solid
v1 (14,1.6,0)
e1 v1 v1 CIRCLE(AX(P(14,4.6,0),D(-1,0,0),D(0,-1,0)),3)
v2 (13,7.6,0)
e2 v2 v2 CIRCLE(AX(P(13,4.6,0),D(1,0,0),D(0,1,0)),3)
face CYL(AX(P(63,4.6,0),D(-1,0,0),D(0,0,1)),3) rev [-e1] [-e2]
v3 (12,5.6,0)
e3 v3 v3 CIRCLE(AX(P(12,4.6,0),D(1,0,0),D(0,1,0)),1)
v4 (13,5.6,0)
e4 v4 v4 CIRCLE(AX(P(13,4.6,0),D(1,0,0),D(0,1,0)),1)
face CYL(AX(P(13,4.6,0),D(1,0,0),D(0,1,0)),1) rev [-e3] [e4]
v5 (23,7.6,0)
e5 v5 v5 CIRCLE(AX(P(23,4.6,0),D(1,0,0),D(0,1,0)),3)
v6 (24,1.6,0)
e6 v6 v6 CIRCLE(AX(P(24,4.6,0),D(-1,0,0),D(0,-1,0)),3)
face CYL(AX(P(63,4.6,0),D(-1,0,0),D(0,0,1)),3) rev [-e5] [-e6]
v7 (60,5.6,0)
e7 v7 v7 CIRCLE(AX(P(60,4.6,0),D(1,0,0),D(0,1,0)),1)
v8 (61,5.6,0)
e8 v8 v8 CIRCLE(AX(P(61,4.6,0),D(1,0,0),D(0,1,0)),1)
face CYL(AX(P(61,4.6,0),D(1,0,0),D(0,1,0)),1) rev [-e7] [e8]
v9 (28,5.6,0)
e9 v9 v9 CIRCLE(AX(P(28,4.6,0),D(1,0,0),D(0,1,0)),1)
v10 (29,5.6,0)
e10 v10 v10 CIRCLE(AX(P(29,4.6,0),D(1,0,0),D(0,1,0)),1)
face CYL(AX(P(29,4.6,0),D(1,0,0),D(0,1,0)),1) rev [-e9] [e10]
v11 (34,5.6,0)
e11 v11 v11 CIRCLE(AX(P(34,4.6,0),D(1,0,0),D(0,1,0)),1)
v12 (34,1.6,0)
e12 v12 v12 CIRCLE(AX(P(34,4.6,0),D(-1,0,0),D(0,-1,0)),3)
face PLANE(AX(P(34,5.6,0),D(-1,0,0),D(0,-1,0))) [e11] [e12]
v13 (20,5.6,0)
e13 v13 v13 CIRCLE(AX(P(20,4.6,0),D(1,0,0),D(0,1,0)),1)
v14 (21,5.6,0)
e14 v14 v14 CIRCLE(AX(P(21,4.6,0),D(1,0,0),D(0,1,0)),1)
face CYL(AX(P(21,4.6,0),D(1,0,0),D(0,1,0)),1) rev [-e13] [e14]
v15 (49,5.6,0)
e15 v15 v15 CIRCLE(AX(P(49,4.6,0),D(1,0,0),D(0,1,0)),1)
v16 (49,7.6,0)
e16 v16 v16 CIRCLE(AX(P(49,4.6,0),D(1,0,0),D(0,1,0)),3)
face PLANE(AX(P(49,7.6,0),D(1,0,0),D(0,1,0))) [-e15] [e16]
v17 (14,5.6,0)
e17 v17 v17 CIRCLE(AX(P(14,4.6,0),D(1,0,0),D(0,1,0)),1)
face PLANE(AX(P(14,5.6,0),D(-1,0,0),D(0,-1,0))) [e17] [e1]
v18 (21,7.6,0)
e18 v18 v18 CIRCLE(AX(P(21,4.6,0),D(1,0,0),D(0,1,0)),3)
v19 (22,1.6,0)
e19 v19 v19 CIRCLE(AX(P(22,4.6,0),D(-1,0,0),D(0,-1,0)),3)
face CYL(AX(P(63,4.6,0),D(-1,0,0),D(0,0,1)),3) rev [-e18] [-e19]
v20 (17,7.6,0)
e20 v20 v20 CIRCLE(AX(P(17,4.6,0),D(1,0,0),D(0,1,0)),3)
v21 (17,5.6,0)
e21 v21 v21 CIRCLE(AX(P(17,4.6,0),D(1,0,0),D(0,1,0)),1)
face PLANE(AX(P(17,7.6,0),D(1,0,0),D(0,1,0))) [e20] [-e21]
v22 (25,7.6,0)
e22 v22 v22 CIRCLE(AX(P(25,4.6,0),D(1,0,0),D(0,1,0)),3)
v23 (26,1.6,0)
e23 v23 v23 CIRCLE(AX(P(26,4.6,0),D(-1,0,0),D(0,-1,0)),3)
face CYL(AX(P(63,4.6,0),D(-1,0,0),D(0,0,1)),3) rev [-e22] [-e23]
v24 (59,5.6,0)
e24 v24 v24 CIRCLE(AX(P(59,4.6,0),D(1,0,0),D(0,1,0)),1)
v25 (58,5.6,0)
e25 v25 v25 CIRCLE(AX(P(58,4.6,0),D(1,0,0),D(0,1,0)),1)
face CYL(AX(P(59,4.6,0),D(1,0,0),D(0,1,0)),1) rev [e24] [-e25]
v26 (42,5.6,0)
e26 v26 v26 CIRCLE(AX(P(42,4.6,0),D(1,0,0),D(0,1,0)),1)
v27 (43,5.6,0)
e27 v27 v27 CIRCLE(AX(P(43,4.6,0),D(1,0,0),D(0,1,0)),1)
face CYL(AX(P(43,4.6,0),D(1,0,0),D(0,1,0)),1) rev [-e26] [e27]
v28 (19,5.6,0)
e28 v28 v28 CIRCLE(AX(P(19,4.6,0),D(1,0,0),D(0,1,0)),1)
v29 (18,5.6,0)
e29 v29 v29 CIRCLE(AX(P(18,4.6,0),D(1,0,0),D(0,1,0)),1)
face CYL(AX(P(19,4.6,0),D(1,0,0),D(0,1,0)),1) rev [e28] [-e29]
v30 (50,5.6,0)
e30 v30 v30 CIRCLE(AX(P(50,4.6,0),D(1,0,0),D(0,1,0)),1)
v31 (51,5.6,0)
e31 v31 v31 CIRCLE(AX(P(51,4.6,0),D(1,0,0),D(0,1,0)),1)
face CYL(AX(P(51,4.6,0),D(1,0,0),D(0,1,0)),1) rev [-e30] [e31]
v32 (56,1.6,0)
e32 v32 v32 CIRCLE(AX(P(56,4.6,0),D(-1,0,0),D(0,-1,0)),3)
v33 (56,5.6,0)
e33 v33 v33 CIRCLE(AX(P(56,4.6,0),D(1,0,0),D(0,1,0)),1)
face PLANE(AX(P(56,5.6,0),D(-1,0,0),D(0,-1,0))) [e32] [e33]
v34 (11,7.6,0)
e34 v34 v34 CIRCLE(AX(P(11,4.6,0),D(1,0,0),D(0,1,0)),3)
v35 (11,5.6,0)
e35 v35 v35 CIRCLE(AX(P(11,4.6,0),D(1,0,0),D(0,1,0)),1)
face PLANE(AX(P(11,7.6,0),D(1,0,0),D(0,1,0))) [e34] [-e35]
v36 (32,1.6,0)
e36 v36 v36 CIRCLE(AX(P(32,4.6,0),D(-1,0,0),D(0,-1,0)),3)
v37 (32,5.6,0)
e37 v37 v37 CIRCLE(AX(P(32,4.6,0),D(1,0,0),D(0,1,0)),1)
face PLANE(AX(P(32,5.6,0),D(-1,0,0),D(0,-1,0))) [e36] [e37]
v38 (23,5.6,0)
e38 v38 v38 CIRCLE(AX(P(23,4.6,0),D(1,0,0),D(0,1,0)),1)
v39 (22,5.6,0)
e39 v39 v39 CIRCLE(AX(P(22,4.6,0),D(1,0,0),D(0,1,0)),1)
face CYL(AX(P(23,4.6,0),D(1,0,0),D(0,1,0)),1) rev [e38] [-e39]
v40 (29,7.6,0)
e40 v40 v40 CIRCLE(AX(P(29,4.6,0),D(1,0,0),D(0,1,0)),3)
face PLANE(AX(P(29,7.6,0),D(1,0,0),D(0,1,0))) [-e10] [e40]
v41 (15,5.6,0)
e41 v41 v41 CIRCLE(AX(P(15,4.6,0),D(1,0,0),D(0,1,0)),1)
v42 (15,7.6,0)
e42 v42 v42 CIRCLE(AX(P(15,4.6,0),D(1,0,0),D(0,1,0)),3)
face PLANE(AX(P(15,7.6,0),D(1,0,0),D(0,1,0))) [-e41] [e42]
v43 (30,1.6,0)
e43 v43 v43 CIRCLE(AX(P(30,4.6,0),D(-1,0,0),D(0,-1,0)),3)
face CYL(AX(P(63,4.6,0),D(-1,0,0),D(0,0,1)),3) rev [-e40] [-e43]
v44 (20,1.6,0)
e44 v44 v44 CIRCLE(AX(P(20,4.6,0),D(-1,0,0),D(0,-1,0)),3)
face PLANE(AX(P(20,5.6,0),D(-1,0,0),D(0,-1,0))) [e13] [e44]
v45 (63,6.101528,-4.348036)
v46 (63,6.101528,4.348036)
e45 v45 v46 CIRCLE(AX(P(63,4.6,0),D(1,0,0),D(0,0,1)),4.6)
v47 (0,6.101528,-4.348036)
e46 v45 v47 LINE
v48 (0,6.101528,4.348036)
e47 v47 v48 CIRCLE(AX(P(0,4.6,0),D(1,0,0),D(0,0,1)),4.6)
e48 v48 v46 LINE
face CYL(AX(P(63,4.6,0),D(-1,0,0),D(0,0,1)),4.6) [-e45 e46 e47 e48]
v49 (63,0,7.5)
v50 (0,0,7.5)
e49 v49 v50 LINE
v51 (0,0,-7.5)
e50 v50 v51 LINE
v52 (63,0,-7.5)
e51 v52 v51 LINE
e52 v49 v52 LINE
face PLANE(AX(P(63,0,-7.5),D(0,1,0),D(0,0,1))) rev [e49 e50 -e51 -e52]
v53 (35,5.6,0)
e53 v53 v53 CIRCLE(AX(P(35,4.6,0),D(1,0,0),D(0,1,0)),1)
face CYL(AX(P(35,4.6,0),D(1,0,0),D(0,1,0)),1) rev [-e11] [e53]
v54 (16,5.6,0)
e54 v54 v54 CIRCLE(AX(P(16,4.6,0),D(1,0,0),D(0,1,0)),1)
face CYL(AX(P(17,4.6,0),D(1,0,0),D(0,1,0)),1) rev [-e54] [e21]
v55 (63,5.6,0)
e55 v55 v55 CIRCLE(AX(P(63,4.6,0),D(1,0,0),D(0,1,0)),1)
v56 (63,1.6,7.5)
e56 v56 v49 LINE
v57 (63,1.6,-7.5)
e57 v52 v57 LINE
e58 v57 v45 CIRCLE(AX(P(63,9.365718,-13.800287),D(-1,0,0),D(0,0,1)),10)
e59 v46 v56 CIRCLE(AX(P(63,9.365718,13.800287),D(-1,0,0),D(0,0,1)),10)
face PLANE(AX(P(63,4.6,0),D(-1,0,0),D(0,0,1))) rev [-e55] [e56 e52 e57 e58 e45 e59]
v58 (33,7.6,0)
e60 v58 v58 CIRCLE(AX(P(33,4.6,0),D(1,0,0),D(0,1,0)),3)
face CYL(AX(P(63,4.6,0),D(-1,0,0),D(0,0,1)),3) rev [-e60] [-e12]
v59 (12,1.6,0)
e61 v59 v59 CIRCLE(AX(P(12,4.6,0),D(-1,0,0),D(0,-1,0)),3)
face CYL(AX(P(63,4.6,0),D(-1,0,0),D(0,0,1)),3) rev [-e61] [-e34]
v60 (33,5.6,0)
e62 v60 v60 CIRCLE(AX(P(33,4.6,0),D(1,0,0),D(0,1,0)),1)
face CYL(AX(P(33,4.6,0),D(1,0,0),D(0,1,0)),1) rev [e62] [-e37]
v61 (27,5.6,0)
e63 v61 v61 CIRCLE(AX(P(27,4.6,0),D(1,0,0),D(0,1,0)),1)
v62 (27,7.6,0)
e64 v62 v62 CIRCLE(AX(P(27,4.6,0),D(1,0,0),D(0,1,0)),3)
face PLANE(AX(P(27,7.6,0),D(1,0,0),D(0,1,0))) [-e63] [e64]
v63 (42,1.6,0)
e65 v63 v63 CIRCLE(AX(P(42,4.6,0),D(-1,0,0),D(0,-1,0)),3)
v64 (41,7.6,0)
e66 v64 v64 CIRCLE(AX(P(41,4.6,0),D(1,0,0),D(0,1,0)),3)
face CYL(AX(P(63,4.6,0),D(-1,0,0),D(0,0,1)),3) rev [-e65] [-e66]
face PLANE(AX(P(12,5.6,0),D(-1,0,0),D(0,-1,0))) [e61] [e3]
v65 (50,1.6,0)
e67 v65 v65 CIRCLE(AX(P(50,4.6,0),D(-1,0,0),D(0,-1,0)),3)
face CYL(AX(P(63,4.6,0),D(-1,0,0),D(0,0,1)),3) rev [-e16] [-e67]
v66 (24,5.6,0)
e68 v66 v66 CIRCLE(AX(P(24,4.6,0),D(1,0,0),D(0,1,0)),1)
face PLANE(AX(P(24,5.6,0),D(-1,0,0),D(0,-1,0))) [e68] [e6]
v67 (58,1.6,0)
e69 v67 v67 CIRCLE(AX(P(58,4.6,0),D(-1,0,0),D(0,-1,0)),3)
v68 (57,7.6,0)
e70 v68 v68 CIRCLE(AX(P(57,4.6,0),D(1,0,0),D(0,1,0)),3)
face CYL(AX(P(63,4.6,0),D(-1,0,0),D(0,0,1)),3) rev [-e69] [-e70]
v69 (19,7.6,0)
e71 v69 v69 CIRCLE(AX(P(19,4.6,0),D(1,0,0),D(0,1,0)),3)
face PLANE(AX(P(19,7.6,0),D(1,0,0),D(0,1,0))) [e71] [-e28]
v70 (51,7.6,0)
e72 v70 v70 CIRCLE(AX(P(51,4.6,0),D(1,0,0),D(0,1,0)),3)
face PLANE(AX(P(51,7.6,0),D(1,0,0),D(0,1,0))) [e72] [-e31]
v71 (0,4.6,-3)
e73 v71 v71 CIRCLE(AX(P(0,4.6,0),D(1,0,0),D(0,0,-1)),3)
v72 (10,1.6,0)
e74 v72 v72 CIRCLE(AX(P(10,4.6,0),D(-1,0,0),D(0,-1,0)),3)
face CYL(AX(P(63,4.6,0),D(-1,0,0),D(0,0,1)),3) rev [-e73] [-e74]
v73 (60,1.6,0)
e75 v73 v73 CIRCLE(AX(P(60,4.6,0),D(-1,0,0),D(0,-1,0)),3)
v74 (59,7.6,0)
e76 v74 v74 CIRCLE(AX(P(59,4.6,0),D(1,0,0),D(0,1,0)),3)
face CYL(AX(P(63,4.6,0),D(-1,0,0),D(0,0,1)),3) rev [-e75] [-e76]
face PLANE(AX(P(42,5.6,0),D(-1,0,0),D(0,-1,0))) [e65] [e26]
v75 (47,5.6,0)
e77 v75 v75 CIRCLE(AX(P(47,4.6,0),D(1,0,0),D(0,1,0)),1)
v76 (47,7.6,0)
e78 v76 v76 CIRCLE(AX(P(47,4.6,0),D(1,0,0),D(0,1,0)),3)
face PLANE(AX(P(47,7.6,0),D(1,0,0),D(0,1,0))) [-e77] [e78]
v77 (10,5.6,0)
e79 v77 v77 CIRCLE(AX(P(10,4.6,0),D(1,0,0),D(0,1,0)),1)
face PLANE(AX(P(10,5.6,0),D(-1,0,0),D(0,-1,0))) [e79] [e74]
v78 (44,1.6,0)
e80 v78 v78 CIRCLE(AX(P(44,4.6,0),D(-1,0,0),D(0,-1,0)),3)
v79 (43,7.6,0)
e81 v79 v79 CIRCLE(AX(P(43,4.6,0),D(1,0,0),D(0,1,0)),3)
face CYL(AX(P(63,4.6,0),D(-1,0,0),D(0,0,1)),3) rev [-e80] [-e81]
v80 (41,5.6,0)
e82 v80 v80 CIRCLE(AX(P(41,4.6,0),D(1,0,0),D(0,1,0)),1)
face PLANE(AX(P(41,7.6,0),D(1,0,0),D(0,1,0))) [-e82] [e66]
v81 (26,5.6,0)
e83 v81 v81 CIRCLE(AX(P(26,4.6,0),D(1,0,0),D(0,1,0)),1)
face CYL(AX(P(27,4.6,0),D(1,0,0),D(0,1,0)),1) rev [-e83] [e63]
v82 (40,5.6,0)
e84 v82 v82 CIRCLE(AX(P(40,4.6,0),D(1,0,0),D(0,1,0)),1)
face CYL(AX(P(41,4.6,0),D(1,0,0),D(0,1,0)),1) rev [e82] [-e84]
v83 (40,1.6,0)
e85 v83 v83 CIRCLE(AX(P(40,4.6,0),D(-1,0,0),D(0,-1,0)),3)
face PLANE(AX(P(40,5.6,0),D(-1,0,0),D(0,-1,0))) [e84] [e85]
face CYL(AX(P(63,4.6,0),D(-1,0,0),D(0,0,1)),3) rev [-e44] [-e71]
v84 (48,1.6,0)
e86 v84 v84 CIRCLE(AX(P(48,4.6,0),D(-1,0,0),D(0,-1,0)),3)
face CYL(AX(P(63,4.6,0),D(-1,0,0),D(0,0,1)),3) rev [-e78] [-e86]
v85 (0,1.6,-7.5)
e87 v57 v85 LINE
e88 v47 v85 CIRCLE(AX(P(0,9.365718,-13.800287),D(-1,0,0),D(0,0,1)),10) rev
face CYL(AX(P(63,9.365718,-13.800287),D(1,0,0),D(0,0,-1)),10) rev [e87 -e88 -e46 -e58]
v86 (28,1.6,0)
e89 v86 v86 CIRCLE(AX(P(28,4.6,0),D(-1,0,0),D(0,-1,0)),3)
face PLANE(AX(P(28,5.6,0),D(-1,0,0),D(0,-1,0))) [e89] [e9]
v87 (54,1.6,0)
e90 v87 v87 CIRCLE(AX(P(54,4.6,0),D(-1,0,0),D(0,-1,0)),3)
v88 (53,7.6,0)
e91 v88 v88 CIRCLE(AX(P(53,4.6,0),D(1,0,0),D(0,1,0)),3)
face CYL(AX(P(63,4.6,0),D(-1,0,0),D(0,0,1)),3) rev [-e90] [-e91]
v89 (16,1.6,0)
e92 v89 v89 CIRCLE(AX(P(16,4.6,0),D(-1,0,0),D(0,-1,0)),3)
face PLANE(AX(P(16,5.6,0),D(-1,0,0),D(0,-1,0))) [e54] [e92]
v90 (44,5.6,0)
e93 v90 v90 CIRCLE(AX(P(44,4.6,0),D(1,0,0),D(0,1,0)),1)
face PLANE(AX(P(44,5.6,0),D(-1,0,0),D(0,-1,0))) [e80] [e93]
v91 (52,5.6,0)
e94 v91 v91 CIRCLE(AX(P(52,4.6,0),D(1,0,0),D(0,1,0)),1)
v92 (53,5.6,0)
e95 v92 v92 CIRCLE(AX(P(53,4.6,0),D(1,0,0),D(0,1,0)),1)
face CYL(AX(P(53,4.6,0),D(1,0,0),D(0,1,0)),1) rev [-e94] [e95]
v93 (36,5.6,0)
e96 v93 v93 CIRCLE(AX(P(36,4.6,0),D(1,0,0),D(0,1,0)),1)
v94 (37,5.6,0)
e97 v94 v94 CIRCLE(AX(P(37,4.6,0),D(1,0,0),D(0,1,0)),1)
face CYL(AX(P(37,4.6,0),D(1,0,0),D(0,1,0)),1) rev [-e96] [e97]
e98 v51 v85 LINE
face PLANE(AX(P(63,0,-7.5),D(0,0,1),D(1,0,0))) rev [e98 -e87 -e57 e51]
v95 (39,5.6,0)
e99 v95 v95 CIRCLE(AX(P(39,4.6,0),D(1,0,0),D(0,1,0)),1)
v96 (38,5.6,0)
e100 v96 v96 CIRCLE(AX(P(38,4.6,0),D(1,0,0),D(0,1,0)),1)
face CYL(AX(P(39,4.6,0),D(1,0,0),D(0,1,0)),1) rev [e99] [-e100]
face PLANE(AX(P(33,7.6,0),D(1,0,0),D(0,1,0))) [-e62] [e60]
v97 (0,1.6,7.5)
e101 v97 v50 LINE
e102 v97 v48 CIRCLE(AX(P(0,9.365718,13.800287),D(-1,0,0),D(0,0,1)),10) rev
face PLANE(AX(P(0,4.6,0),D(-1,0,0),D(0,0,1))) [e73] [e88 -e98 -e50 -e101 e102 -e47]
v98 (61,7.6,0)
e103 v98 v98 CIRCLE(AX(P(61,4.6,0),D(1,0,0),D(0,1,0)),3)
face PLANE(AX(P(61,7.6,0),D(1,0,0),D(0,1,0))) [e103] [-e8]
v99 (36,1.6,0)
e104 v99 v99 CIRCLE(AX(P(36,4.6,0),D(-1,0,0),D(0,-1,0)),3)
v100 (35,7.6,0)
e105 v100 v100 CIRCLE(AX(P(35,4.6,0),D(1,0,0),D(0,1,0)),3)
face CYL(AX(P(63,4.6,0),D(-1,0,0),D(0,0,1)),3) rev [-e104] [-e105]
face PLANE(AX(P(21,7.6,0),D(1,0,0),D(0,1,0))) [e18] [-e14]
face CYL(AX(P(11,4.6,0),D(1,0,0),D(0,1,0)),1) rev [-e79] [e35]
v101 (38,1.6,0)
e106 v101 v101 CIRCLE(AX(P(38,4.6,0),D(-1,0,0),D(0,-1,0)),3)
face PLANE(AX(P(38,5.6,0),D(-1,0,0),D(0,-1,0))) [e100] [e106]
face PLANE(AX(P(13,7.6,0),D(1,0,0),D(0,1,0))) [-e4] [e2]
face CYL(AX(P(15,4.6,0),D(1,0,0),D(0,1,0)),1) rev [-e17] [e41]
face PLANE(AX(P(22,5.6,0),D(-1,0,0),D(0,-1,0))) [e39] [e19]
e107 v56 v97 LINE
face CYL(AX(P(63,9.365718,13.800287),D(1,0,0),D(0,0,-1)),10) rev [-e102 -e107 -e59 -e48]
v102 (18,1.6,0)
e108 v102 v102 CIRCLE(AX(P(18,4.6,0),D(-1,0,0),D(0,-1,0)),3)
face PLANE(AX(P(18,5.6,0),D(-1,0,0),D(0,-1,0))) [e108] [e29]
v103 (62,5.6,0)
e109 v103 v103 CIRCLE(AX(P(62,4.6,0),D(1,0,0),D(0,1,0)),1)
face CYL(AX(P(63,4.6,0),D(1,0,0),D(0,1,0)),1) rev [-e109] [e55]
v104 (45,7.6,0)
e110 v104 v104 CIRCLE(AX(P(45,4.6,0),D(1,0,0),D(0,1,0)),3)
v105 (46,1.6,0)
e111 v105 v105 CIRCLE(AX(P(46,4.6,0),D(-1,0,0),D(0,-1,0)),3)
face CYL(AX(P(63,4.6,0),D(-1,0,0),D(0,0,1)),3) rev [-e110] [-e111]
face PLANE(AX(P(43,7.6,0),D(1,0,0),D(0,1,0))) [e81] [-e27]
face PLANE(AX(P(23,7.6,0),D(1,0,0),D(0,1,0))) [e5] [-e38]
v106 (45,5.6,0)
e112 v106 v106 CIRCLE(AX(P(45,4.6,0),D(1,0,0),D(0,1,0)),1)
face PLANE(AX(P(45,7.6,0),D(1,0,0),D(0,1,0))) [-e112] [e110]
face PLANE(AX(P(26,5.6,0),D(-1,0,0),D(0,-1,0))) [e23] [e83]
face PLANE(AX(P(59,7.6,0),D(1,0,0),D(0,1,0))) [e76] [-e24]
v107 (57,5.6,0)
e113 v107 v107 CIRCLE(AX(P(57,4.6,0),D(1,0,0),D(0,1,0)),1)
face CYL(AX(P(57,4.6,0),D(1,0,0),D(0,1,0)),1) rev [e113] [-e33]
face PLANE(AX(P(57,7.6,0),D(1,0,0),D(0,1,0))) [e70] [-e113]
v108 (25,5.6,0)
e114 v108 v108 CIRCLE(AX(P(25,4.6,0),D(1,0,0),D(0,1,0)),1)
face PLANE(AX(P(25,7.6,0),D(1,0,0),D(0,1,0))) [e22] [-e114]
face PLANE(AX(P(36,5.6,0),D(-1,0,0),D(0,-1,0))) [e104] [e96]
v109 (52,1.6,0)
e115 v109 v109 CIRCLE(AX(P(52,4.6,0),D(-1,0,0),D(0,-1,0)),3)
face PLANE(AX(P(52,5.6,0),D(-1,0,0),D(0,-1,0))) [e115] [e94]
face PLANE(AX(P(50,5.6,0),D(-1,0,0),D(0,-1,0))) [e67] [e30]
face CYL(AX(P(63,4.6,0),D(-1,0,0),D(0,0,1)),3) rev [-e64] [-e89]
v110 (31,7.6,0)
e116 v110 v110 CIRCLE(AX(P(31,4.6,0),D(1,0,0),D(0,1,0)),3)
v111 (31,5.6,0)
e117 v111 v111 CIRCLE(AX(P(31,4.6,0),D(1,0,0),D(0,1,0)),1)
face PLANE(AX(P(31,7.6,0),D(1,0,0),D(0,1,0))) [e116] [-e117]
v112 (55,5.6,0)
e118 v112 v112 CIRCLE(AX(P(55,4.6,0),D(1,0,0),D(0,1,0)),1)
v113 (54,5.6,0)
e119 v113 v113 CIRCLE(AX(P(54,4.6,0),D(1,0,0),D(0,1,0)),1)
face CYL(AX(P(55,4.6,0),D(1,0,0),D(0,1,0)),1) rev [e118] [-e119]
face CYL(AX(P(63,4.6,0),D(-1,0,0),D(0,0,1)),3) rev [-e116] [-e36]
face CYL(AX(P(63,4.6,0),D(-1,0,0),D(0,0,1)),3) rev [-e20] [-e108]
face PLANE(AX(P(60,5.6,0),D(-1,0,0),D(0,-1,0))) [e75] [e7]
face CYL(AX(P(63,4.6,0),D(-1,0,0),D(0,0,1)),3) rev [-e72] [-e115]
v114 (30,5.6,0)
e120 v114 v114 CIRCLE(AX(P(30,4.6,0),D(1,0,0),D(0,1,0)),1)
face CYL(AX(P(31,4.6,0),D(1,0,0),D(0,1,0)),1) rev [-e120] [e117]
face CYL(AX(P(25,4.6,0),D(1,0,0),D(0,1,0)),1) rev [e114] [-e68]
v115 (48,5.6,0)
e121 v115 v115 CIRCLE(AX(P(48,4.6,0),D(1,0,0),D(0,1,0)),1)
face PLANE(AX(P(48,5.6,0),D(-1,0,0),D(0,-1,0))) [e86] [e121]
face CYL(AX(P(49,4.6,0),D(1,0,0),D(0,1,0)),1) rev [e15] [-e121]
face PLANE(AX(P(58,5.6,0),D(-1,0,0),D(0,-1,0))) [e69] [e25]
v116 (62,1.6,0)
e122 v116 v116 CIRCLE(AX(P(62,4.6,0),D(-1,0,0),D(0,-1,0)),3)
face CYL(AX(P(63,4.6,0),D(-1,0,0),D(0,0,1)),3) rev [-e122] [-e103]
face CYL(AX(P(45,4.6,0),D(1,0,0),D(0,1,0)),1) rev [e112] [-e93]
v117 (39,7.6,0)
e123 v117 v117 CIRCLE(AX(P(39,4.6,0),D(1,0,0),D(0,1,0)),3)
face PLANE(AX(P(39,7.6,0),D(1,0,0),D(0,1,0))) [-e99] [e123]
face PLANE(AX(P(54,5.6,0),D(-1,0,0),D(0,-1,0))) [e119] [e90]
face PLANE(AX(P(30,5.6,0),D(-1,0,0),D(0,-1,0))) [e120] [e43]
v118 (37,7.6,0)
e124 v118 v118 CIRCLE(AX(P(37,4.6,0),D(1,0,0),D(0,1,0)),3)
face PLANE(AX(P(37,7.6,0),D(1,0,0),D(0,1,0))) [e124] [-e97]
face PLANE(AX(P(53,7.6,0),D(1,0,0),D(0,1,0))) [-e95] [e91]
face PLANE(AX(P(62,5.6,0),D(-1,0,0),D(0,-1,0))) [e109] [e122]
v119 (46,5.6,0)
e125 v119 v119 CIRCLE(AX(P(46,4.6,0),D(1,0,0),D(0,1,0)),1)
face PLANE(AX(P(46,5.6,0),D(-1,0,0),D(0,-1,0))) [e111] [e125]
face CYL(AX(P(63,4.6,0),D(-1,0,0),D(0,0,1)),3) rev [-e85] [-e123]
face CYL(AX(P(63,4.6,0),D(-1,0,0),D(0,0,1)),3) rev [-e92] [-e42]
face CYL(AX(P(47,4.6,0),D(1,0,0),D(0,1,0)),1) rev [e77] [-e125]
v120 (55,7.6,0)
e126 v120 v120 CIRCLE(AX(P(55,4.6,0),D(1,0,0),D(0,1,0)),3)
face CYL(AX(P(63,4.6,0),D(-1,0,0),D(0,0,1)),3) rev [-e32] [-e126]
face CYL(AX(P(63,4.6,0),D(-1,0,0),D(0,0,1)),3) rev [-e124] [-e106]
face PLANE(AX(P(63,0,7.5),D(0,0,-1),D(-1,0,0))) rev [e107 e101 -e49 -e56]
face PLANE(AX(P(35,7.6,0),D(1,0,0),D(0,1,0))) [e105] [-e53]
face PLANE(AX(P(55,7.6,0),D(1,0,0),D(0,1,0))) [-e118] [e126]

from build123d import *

# Parameters (mm, degrees)
SKETCH2_R           = 3
BOSS_EXTRUDE1_DEPTH = 63
FILLET1_R           = 10
SKETCH4_W           = 1
SKETCH4_H           = 2
LPATTERN1_COUNT     = 27
LPATTERN1_PITCH     = 2


with BuildPart() as part:
    # Sketch2 → Boss-Extrude1 (new body)
    with BuildSketch(Plane(origin=(0, 0, 0), x_dir=(0, 0, -1), z_dir=(1, 0, 0))):
        with BuildLine():
            Line((7.5, 0), (-7.5, 0))
            Line((-7.5, 0), (-7.5, 1.6))
            Line((-7.5, 1.6), (-4.6, 1.6))
            Line((-4.6, 1.6), (-4.6, 4.6))
            ThreePointArc((-4.6, 4.6), (0, 9.2), (4.6, 4.6))
            Line((4.6, 4.6), (4.6, 1.6))
            Line((4.6, 1.6), (7.5, 1.6))
            Line((7.5, 1.6), (7.5, 0))
        make_face()
        with Locations((0, 4.6)):
            Circle(SKETCH2_R, mode=Mode.SUBTRACT)
    extrude(amount=BOSS_EXTRUDE1_DEPTH)

    # Fillet1
    # the kernel refuses this fillet: 10 mm, written as the material it adds along each edge
    with BuildSketch(Plane(origin=(0, 1.6, 4.6), x_dir=(0, 0, 1), z_dir=(1, 0, 0))) as fillet1_piece_1:
        with BuildLine():
            CenterArc((9.2002873, -7.76571825), FILLET1_R, 129.052242215, 31.8961874)
            Line((-0.251964275, -4.501527668), (-1.197189433, -4.17510861))
            ThreePointArc((-1.197189433, -4.17510861), (-1, -3), (-1, 0))
            Line((-1, 0), (0, 1))
            ThreePointArc((0, 1), (1.45, 1), (2.26997127, 0.776571825))
            Line((2.26997127, 0.776571825), (2.9, 0))
        make_face()
    extrude(amount=63)
    with BuildSketch(Plane(origin=(0, 1.6, -4.6), x_dir=(0, 0.9984371795736424, 0.05588558351695166), z_dir=(1, 0, 0))) as fillet1_piece_2:
        with BuildLine():
            CenterArc((7.239418403, -9.619900599), FILLET1_R, 105.847893216, 31.8961874)
            Line((-0.162068192, -2.895467821), (-0.902216852, -2.223024543))
            ThreePointArc((-0.902216852, -2.223024543), (-1.079471276, -1.391848327), (-0.99843718, 0.055885584))
            Line((-0.99843718, 0.055885584), (0.055885584, 0.99843718))
            ThreePointArc((0.055885584, 0.99843718), (3.051197122, 0.830780429), (4.235489295, 0.96199006))
            Line((4.235489295, 0.96199006), (4.508573759, 0))
        make_face()
    extrude(amount=63)

    # Sketch4 → Revolve1 (revolve)
    with BuildSketch(Plane.XY, mode=Mode.PRIVATE) as revolve1_sk:
        with Locations((62.5, 6.6)):
            Rectangle(SKETCH4_W, SKETCH4_H)
    revolve1 = revolve(revolve1_sk.sketch.rotate(Axis((63, 4.6, 0), (-1, 0, 0)), 180), axis=Axis((63, 4.6, 0), (-1, 0, 0)))

    # LPattern1: Revolve1 ×27
    with Locations(*[(-i * LPATTERN1_PITCH, 0, 0) for i in range(1, LPATTERN1_COUNT)]):
        add(revolve1)


solid = part.part
